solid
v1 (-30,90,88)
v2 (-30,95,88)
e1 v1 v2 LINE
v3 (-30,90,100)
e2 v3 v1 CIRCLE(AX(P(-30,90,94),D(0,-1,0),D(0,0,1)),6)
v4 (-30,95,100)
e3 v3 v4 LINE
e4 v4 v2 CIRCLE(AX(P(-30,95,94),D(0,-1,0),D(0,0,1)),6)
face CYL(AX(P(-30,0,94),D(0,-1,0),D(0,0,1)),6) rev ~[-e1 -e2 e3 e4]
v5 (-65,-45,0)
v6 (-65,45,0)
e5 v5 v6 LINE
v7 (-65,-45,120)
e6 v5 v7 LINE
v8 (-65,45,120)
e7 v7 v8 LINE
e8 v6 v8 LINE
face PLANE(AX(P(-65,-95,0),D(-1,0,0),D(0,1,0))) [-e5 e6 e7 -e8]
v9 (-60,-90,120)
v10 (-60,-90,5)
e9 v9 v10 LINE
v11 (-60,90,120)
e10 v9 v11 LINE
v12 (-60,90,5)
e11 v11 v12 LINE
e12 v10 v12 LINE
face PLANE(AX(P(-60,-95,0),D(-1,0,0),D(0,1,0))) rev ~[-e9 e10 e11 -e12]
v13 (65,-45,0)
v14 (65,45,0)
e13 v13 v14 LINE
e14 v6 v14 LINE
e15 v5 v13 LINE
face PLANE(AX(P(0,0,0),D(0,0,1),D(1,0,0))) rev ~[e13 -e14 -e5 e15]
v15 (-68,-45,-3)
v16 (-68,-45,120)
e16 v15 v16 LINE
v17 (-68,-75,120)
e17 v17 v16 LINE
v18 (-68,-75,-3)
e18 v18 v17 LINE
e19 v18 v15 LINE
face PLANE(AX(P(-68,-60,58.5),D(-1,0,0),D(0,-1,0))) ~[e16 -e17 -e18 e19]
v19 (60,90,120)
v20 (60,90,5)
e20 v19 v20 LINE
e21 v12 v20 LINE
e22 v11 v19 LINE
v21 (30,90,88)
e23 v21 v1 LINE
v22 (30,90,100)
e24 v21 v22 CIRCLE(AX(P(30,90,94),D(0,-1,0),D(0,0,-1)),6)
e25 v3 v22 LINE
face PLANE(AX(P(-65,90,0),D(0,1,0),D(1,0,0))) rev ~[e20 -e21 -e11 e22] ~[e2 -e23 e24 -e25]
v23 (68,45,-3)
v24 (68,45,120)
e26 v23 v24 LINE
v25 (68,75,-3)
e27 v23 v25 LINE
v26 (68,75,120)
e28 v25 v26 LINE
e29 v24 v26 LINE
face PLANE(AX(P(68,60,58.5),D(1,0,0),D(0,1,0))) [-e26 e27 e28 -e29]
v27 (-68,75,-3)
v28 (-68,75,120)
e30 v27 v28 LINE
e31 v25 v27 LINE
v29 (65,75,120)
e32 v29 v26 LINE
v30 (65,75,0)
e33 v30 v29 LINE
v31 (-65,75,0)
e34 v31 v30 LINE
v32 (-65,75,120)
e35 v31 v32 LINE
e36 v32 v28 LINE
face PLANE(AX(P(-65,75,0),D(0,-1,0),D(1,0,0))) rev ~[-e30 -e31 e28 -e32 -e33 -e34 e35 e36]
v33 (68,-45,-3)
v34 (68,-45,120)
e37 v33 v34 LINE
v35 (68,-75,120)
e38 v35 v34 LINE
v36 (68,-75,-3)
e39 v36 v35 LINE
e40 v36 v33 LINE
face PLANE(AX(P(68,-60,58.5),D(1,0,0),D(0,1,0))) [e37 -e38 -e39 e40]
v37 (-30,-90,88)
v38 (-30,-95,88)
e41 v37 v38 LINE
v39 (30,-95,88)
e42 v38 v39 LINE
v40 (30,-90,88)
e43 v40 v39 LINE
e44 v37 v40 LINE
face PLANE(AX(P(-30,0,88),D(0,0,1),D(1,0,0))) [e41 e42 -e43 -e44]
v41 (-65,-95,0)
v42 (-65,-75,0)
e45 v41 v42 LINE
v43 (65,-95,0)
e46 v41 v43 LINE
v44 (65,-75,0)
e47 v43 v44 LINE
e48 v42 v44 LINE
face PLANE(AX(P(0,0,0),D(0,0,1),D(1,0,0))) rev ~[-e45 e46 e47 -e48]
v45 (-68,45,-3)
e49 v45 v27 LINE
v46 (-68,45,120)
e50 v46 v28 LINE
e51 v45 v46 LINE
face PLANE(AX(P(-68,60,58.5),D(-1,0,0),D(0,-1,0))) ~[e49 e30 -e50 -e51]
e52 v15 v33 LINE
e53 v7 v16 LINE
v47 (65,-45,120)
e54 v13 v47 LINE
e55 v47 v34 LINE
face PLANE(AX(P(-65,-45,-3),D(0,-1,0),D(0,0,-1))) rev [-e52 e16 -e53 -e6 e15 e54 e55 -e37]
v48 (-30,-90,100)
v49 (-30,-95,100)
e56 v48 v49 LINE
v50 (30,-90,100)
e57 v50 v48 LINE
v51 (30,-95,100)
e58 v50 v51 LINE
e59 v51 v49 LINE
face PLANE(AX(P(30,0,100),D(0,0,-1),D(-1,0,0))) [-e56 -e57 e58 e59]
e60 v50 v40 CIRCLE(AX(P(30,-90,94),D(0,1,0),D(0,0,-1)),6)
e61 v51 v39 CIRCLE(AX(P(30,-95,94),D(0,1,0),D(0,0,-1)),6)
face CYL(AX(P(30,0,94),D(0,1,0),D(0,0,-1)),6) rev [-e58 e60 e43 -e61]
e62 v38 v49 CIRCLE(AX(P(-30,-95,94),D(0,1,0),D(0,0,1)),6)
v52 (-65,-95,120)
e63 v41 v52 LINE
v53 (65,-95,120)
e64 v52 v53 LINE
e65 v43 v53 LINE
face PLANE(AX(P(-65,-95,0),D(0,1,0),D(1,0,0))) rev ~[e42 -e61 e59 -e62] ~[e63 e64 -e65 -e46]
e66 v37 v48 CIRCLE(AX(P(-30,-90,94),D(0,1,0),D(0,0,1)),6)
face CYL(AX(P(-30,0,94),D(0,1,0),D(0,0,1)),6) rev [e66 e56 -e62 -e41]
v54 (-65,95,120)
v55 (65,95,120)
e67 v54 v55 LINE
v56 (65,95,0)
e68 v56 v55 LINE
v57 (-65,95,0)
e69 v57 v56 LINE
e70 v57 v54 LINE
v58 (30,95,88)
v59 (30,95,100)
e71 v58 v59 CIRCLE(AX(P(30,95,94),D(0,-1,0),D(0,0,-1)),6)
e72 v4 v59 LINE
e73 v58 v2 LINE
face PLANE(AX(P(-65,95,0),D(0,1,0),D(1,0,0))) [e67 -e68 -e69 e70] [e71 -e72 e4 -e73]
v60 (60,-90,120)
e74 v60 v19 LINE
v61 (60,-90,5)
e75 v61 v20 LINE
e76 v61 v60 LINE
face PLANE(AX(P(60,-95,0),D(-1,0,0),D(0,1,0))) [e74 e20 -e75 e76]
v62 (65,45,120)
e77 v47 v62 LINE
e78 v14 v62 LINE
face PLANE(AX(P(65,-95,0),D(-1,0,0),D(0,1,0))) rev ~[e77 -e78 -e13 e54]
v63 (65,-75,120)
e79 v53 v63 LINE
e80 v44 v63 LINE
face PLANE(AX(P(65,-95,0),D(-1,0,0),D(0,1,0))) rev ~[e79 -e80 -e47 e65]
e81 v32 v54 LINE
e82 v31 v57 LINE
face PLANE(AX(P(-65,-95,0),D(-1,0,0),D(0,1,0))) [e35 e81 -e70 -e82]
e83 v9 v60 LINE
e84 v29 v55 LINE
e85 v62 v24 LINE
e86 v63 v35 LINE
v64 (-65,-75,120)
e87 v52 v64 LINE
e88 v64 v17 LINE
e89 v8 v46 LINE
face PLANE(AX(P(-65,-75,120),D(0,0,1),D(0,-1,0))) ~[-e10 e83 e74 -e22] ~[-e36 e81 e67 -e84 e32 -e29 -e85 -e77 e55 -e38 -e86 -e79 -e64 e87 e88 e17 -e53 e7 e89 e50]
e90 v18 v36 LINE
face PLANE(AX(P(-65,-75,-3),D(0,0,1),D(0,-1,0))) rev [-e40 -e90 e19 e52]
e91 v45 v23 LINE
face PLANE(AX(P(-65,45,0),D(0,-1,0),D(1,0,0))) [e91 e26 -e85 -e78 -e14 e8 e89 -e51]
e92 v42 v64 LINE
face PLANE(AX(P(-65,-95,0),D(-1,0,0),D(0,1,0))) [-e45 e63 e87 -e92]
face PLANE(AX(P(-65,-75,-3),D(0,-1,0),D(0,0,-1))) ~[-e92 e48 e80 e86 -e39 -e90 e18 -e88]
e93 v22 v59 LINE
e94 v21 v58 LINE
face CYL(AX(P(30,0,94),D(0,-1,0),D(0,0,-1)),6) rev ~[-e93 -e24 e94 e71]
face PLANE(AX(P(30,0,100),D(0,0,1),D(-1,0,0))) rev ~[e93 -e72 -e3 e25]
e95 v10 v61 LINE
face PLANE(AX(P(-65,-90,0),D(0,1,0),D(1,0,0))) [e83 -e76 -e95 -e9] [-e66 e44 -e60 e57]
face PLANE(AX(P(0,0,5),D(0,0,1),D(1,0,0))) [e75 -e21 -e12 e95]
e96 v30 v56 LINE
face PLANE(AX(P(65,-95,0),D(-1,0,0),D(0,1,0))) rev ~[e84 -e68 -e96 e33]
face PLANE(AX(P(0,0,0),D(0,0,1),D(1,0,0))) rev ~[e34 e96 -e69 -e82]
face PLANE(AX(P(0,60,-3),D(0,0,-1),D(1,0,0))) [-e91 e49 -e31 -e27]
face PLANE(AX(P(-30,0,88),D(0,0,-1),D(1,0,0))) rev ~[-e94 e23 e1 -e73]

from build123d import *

# Parameters (mm, degrees)
F0_W          = 130
F0_H          = 190
F2_DEPTH      = 120
F3_T          = -5
F5_DEPTH      = 95.001
F5_DEPTH_BACK = 95.001
F6_W          = 130
F6_H          = 30
F7_DEPTH      = 3
F8_W          = 30
F8_H          = 123
F9_DEPTH      = 3


# Not quite as in the source:
# - a pattern or mirror of a feature is missing from the dataset's text; its kind, count and spacing are read off the source's solid


with BuildPart() as f2:
    # F0 (on Top) → F2 (new body, through all)
    with BuildSketch(Plane.XY):
        Rectangle(F0_W, F0_H)
    extrude(amount=F2_DEPTH)

    # F3
    f3_openings = [f2.faces().sort_by_distance(p)[0] for p in [
        (0, 0, 120),
    ]]
    offset(amount=F3_T, openings=f3_openings)

    # F4 (on Front) → F5 (cut, two sides)
    with BuildSketch(Plane.XZ) as f5_sk:
        with BuildLine():
            Line((30, 100), (-30, 100))
            ThreePointArc((-30, 100), (-36, 94), (-30, 88))
            Line((-30, 88), (30, 88))
            ThreePointArc((30, 88), (36, 94), (30, 100))
        make_face()
    extrude(amount=-F5_DEPTH, mode=Mode.SUBTRACT)
    extrude(f5_sk.sketch, amount=F5_DEPTH_BACK, mode=Mode.SUBTRACT)

    # F6 (on face) → F7 (join)
    with BuildSketch(Plane(origin=(0, 0, 0), x_dir=(1, 0, 0), z_dir=(0, 0, -1))):
        with Locations((0, 60)):
            Rectangle(F6_W, F6_H)
        with Locations((0, -60)):
            Rectangle(F6_W, F6_H)
    extrude(amount=F7_DEPTH)

    # F8 (on face) → F9 (join)
    with BuildSketch(Plane.YZ.offset(65)):
        with Locations((-60, 58.5)):
            Rectangle(F8_W, F8_H)
        with Locations((60, 58.5)):
            Rectangle(F8_W, F8_H)
    f9 = extrude(amount=F9_DEPTH)

    # F9_copies: F9 across plane
    add(f9.mirror(Plane(origin=(0, 0, 0), x_dir=(0, 0, -1), z_dir=(-1, 0, 0))))


solid = f2.part
